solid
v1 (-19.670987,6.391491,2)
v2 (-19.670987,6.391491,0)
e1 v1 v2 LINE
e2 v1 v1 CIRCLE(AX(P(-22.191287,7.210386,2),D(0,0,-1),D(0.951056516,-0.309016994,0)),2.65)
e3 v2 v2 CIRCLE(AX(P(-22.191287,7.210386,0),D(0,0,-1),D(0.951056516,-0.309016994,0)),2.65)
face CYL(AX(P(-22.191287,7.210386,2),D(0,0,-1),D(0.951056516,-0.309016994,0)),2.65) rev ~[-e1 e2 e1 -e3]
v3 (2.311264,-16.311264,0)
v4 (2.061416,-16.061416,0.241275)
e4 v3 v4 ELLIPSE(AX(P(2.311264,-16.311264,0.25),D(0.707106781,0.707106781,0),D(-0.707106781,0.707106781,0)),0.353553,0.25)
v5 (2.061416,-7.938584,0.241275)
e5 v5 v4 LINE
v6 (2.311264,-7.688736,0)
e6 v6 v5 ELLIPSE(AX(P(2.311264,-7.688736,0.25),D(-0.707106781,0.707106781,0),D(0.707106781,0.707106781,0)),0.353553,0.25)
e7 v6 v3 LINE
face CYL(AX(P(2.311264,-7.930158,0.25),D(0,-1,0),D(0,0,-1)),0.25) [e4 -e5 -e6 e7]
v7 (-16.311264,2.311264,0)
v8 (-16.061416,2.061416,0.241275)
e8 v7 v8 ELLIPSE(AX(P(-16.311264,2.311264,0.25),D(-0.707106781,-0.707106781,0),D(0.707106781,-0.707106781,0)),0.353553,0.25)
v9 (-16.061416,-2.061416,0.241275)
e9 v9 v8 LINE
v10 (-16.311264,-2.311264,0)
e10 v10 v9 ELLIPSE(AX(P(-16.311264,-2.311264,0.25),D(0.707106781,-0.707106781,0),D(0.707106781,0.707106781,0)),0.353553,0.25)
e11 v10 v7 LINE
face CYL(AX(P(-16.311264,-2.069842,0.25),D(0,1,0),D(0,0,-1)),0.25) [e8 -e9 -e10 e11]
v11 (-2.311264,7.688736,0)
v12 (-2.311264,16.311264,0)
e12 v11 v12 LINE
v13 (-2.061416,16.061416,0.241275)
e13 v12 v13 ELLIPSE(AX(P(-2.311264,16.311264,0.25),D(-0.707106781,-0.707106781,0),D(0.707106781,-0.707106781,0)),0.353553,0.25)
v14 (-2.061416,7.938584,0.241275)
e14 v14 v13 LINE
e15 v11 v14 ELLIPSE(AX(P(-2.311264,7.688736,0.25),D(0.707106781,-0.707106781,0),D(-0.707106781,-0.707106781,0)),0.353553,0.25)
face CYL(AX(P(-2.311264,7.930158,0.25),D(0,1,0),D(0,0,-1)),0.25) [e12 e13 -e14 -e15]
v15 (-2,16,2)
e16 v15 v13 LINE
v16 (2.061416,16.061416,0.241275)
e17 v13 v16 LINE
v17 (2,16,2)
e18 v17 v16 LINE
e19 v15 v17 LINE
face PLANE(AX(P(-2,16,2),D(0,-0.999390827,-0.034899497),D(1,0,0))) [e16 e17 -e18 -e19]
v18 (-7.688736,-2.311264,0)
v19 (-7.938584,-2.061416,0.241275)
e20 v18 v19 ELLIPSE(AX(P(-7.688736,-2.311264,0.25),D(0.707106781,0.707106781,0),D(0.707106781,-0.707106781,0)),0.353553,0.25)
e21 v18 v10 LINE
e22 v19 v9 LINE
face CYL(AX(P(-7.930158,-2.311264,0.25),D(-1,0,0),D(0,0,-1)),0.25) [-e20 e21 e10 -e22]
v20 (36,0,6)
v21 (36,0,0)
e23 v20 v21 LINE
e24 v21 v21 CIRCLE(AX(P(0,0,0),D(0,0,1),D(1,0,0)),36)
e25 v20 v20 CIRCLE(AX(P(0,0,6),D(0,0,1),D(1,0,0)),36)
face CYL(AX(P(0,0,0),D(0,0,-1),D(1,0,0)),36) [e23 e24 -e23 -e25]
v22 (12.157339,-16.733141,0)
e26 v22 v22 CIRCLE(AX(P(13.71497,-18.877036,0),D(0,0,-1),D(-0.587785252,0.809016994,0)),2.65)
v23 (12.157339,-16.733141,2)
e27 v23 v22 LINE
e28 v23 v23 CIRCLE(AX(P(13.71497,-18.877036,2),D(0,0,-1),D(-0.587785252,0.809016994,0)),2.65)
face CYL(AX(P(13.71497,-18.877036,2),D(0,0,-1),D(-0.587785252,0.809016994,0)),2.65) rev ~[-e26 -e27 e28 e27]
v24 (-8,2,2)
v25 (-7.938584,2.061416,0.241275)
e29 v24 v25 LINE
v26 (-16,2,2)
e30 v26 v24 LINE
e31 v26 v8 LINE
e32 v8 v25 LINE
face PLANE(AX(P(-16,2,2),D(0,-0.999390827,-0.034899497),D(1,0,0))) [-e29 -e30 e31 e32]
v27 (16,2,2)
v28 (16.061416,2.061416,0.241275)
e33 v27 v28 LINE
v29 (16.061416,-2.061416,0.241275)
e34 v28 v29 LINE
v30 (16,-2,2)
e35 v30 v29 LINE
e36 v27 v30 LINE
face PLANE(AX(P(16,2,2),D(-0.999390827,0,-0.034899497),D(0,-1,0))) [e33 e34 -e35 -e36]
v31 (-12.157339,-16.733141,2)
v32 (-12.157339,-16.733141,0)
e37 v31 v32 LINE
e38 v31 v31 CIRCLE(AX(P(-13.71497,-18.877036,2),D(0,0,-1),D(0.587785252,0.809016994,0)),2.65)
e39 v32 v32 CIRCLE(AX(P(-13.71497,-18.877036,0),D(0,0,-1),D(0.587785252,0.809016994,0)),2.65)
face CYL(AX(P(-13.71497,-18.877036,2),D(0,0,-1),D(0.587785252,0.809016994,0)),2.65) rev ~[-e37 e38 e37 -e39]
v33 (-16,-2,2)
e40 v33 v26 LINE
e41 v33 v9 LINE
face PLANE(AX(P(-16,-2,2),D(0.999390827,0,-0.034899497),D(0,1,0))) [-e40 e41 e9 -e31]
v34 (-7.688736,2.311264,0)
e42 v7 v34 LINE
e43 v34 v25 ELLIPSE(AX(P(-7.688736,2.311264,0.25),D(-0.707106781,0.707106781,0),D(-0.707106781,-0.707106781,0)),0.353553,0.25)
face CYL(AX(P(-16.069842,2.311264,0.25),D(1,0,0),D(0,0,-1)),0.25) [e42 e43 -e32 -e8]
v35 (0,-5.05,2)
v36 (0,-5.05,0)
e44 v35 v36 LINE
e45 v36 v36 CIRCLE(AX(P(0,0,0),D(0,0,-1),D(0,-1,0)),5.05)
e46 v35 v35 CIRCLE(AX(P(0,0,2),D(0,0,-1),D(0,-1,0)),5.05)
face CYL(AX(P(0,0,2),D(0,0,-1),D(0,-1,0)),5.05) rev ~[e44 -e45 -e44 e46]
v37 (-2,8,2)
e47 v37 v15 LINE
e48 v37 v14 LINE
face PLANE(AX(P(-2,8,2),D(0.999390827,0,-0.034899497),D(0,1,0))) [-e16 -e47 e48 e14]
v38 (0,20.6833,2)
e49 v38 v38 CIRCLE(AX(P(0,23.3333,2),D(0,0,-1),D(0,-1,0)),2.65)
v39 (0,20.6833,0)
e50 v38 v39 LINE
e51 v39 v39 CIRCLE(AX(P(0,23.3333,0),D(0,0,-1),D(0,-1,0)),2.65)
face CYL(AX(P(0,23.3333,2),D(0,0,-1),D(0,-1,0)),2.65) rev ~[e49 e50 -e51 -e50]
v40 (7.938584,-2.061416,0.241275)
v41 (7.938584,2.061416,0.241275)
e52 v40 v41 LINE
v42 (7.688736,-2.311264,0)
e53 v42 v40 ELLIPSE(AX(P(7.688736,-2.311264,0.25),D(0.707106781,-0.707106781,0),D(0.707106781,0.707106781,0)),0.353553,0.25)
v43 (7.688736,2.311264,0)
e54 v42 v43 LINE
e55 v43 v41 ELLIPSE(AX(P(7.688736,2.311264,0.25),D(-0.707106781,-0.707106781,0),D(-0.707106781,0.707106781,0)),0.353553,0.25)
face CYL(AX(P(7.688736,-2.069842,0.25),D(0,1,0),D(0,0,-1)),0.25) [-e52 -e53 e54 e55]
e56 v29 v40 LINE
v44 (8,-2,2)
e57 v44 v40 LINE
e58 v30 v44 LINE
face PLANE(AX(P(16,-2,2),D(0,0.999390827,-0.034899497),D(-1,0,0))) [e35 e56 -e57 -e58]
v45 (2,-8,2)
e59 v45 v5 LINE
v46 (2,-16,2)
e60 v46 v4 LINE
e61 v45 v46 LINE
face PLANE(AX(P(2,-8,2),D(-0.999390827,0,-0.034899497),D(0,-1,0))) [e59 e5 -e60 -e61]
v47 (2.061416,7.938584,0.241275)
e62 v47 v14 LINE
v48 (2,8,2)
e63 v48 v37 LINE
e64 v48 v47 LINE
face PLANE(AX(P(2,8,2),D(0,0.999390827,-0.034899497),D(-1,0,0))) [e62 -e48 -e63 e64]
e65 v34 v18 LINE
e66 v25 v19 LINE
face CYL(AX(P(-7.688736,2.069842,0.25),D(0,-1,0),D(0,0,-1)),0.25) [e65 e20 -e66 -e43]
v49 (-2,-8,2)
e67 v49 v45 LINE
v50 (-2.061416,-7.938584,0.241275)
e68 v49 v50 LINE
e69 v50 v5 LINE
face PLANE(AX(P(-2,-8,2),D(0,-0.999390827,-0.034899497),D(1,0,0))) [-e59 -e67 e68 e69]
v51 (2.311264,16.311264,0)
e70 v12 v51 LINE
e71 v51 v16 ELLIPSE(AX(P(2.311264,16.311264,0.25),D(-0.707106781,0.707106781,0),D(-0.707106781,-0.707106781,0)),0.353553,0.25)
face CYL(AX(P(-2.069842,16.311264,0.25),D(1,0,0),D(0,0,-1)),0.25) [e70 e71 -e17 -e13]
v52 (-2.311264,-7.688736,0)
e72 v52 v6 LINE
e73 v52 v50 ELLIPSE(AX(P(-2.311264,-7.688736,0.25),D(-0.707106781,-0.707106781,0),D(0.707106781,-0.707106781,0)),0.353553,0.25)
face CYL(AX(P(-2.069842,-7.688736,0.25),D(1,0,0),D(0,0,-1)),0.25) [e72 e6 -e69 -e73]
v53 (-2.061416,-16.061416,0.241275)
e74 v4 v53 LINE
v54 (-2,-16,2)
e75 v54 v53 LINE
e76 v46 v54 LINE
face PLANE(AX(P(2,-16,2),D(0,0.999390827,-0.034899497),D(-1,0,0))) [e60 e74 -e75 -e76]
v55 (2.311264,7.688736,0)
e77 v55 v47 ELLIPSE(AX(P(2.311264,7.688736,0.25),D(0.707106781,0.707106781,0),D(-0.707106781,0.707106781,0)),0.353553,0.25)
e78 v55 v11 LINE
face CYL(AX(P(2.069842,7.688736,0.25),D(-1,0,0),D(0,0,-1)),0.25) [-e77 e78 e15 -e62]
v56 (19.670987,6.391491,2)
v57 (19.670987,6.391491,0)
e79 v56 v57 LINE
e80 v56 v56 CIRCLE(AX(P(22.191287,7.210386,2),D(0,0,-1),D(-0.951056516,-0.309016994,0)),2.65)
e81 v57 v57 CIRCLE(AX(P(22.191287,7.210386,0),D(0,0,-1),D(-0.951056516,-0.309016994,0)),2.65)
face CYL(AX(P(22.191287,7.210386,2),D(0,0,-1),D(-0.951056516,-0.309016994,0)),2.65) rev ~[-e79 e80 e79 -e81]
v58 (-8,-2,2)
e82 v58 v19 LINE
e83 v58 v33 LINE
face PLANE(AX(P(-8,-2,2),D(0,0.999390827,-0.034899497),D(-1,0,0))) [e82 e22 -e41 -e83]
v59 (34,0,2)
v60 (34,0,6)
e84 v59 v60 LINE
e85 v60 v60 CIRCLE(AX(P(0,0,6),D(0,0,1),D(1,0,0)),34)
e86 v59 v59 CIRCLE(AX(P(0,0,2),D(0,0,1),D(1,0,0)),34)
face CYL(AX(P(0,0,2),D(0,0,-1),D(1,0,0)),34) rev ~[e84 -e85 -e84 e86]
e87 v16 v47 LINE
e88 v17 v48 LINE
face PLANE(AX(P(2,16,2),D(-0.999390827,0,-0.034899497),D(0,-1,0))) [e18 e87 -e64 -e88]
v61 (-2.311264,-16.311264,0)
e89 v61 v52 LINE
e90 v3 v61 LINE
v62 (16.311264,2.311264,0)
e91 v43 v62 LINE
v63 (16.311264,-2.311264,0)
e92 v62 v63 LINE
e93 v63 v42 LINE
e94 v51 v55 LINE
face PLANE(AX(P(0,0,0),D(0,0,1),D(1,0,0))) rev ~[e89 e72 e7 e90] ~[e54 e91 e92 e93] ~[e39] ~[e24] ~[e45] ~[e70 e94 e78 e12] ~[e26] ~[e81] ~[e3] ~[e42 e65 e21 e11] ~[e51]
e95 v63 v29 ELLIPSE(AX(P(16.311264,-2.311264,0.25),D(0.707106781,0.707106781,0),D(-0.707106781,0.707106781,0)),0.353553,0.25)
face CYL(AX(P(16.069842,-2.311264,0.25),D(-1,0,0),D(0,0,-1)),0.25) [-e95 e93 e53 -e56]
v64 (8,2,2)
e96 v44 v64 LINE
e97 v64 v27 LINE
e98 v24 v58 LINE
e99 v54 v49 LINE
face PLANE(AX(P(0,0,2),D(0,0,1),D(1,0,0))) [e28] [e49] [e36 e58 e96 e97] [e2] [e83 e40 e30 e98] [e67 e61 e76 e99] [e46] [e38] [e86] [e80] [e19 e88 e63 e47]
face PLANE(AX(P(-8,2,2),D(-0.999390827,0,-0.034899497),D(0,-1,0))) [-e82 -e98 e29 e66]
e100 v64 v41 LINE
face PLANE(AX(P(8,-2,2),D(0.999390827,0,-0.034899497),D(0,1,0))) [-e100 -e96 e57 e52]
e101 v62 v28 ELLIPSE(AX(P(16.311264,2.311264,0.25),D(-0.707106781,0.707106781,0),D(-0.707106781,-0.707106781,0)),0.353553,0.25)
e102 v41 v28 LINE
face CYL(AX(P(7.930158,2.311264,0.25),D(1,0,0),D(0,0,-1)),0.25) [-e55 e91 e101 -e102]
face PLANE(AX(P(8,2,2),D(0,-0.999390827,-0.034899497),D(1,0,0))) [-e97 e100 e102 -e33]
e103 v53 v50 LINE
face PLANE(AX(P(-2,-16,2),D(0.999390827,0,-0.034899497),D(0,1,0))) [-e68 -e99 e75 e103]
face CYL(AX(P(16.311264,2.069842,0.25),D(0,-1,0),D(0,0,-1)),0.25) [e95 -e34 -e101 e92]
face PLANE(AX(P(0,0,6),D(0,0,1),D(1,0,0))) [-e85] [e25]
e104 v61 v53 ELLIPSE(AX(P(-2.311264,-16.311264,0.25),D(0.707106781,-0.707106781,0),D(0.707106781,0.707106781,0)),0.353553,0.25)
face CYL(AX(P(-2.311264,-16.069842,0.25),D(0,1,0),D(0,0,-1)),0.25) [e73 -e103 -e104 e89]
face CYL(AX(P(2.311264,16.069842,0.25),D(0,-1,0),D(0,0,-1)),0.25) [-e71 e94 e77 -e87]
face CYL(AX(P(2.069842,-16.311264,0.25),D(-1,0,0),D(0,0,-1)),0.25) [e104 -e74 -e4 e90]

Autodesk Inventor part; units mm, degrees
ref_plane "YZ Plane" through (0, 0, 0) normal (1, 0, 0) x (0, 1, 0)
ref_plane "XZ Plane" through (0, 0, 0) normal (0, 1, 0) x (-1, 0, 0)
ref_plane "XY Plane" through (0, 0, 0) normal (0, 0, 1) x (1, 0, 0)
sketch "Sketch1" plane through (0, 0, 0) normal (0, 0, 1) x (1, 0, 0)
  circle A0 centre (0, 0) radius 36
  dimension "d0" = 72
extrude "Extrusion1" add sketch "Sketch1" along normal blind 2
sketch "Sketch2" plane through (0, 0, 2) normal (0, 0, 1) x (1, 0, 0)
  circle A0 centre (0, 0) radius 36 projected
  circle A1 centre (0, 0) radius 34
  dimension "d3" = 2
extrude "Extrusion2" add sketch "Sketch2" along normal blind 4
sketch "Sketch4" plane through (0, 0, 2) normal (0, 0, 1) x (1, 0, 0)
  point P0 (0, 0)
  point P1 (0, 0)
hole "Hole1" at (0, 0, 2) direction (0, 0, -1) diameter 10.1 end through all
sketch "Sketch5" plane through (0, 0, 2) normal (0, 0, 1) x (1, 0, 0)
  point P0 (0, 0)
  point P1 (0, 23.3333)
  dimension "d13" = 23.3333
hole "Hole2" at (0, 23.3333, 2) direction (0, 0, -1) diameter 5.3 end through all
pattern_circular "Circular Pattern1" count 5 over 360 about axis through (0, 0, -100) along (0, 0, 1) of "Hole2"
sketch "Sketch8" plane through (0, 0, 2) normal (0, 0, 1) x (1, 0, 0)
  circle A0 centre (22.1913, 7.2104) radius 2.65 projected
  circle A1 centre (13.715, -18.8771) radius 2.65 projected
  circle A2 centre (-13.715, -18.8771) radius 2.65 projected
  circle A3 centre (-22.1913, 7.2104) radius 2.65 projected
  circle A4 centre (0, 23.3333) radius 2.65 projected
  circle A5 centre (0, 0) radius 5.05 projected
  circle A6 centre (0, 0) radius 34 projected
  line L0 (-2, 16) -> (2, 16)
  line L1 (2, 16) -> (2, 8)
  line L2 (2, 8) -> (-2, 8)
  line L3 (-2, 8) -> (-2, 16)
  dimension "d43" = 4
  dimension "d44" = 8
  dimension "d45" = 8
  dimension "d48" = 2
extrude "Extrusion5" cut sketch "Sketch8" against normal up to surface (2 mm away) draft 2 contours L0 L1 L2 L3
fillet "Fillet2" radius 0.25 4 edges at (0, 7.9302, 0) (2.0698, 12, 0) (0, 16.0698, 0) (-2.0698, 12, 0)
pattern_circular "Circular Pattern3" count 4 over 360 about axis through (0, 0, -100) along (0, 0, 1) of "Extrusion5", "Fillet2"
equation "\"d0\" = W_innerDiameter + W_wallThickness"
equation "\"d1\" = W_wallThickness"
equation "\"d3\" = W_wallThickness"
equation "\"d4\" = W_innerDepth"
equation "\"d6\" = W_innerGearHoleDiameter"
equation "\"d13\" = OG_distanceFromCenter"
equation "\"d14\" = W_outerGearHoleDiameter"
equation "\"W_wallThickness\" = 2"
equation "\"W_innerDepth\" = 4"
equation "\"W_innerGearHoleDiameter\" = 10.1"
equation "\"W_outerGearHoleDiameter\" = 5.3"
equation "\"OG_distanceFromCenter\" = 23.33333"
equation "\"W_innerDiameter\" = 70"
equation "\"Wheel_Related_W_\" = 0"
equation "\"W_holesClearance\" = 0.3"
equation "\"TempSpotReserved7\" = 0"
equation "\"TempSpotReserved8\" = 0"
equation "\"TempSpotReserved9\" = 0"
equation "\"TempSpotReserved10\" = 0"
equation "\"TempSpotReserved11\" = 0"
equation "\"TempSpotReserved12\" = 0"
equation "\"TempSpotReserved13\" = 0"
equation "\"TempSpotReserved14\" = 0"
equation "\"TempSpotReserved15\" = 0"
equation "\"TempSpotReserved16\" = 0"
equation "\"TempSpotReserved17\" = 0"
equation "\"TempSpotReserved18\" = 0"
equation "\"TempSpotReserved19\" = 0"
equation "\"TempSpotReserved20\" = 0"
equation "\"Inner_Gear_Related_IG_\" = 0"
equation "\"IG_shaftDiameter\" = 7.5"
equation "\"IG_shaftLength\" = 15"
equation "\"IG_gearThickness\" = 2"
equation "\"TempSpotReserved25\" = 0"
equation "\"TempSpotReserved26\" = 0"
equation "\"TempSpotReserved27\" = 0"
equation "\"TempSpotReserved28\" = 0"
equation "\"TempSpotReserved29\" = 0"
equation "\"TempSpotReserved30\" = 0"
equation "\"TempSpotReserved31\" = 0"
equation "\"TempSpotReserved32\" = 0"
equation "\"TempSpotReserved33\" = 0"
equation "\"TempSpotReserved34\" = 0"
equation "\"TempSpotReserved35\" = 0"
equation "\"TempSpotReserved36\" = 0"
equation "\"TempSpotReserved37\" = 0"
equation "\"TempSpotReserved38\" = 0"
equation "\"TempSpotReserved39\" = 0"
equation "\"TempSpotReserved40\" = 0"
equation "\"Outer_Gear_Related_OG_\" = 0"
equation "\"OG_shaftDiameter\" = 5"
equation "\"OG_gearDiameter\" = 26.66667"
equation "\"OG_shaftLength\" = 7"
equation "\"OG_gearThickness\" = 2"
equation "\"TempSpotReserved47\" = 0"
equation "\"TempSpotReserved48\" = 0"
equation "\"TempSpotReserved49\" = 0"
equation "\"TempSpotReserved50\" = 0"
equation "\"TempSpotReserved51\" = 0"
equation "\"TempSpotReserved52\" = 0"
equation "\"TempSpotReserved53\" = 0"
equation "\"TempSpotReserved54\" = 0"
equation "\"TempSpotReserved55\" = 0"
equation "\"TempSpotReserved56\" = 0"
equation "\"TempSpotReserved57\" = 0"
equation "\"TempSpotReserved58\" = 0"
equation "\"TempSpotReserved59\" = 0"
equation "\"TempSpotReserved60\" = 0"
equation "\"Leg_Extensions_Related_LE_\" = 0"
equation "\"LE_baseDiameter\" = 5"
equation "\"LE_maxLength\" = 24.6522"
equation "\"LE_thickness\" = 2.5"
equation "\"IG_ratioToOuterGear\" = 0.75"
equation "\"B_bearingThickness\" = 1"
equation "\"TempSpotReserved43\" = 0"
equation "\"TempSpotReserved45\" = 0"
equation "\"Thisisatest\" = 25.4"
equation "\"TempSpotReserved46\" = 0"
equation "\"TempSpotReserved44\" = 0"
equation "\"LE_offsetAboveOuterGear\" = 0"
equation "\"Bearing_Related_B_\" = 0"
equation "\"TempSpotReserved42\" = 0"
equation "\"OG_skirtOffset\" = 1"
equation "\"OG_skirtThickness\" = 1"
equation "\"IG_skirtThickness\" = 2"
equation "\"IG_extentionLength\" = 18.33333"
equation "\"IG_extentionThickness\" = 3"
equation "\"IG_slitWidth\" = 4"
equation "\"IG_slitlength\" = 8"
equation "\"IG_slitClearance\" = 0.2"
equation "\"IG_slitDistanceFromCenterHole\" = 8"
equation "\"Reserved_10\" = 0"
equation "\"Reserved_9\" = 0"
equation "\"Reserved_11\" = 0"
equation "\"Reserved_12\" = 0"
equation "\"Reserved_8\" = 0"
equation "\"Reserved_7\" = 0"
equation "\"Reserved_26\" = 0"
equation "\"Reserved_20\" = 0"
equation "\"Reserved_22\" = 0"
equation "\"Reserved_23\" = 0"
equation "\"Reserved_25\" = 0"
equation "\"Reserved_24\" = 0"
equation "\"Reserved_21\" = 0"
equation "\"Reserved_19\" = 0"
equation "\"Reserved_27\" = 0"
equation "\"Reserved_14\" = 0"
equation "\"Reserved_15\" = 0"
equation "\"Reserved_16\" = 0"
equation "\"Reserved_13\" = 0"
equation "\"Reserved_17\" = 0"
equation "\"Reserved_18\" = 0"
equation "\"Bearing_Related_BR_\" = 0"
equation "\"BR_bearingThickness\" = 1"
equation "\"Block_Related_BL_\" = 0"
equation "\"BL_width\" = 3.8"
equation "\"BL_length\" = 7.8"
equation "\"W_filletRadius\" = 0.25"
equation "\"W_extrutsionTaperAngle\" = 2deg"
equation "\"OG_protrudeDistance\" = 3"
properties part number "wheel"
